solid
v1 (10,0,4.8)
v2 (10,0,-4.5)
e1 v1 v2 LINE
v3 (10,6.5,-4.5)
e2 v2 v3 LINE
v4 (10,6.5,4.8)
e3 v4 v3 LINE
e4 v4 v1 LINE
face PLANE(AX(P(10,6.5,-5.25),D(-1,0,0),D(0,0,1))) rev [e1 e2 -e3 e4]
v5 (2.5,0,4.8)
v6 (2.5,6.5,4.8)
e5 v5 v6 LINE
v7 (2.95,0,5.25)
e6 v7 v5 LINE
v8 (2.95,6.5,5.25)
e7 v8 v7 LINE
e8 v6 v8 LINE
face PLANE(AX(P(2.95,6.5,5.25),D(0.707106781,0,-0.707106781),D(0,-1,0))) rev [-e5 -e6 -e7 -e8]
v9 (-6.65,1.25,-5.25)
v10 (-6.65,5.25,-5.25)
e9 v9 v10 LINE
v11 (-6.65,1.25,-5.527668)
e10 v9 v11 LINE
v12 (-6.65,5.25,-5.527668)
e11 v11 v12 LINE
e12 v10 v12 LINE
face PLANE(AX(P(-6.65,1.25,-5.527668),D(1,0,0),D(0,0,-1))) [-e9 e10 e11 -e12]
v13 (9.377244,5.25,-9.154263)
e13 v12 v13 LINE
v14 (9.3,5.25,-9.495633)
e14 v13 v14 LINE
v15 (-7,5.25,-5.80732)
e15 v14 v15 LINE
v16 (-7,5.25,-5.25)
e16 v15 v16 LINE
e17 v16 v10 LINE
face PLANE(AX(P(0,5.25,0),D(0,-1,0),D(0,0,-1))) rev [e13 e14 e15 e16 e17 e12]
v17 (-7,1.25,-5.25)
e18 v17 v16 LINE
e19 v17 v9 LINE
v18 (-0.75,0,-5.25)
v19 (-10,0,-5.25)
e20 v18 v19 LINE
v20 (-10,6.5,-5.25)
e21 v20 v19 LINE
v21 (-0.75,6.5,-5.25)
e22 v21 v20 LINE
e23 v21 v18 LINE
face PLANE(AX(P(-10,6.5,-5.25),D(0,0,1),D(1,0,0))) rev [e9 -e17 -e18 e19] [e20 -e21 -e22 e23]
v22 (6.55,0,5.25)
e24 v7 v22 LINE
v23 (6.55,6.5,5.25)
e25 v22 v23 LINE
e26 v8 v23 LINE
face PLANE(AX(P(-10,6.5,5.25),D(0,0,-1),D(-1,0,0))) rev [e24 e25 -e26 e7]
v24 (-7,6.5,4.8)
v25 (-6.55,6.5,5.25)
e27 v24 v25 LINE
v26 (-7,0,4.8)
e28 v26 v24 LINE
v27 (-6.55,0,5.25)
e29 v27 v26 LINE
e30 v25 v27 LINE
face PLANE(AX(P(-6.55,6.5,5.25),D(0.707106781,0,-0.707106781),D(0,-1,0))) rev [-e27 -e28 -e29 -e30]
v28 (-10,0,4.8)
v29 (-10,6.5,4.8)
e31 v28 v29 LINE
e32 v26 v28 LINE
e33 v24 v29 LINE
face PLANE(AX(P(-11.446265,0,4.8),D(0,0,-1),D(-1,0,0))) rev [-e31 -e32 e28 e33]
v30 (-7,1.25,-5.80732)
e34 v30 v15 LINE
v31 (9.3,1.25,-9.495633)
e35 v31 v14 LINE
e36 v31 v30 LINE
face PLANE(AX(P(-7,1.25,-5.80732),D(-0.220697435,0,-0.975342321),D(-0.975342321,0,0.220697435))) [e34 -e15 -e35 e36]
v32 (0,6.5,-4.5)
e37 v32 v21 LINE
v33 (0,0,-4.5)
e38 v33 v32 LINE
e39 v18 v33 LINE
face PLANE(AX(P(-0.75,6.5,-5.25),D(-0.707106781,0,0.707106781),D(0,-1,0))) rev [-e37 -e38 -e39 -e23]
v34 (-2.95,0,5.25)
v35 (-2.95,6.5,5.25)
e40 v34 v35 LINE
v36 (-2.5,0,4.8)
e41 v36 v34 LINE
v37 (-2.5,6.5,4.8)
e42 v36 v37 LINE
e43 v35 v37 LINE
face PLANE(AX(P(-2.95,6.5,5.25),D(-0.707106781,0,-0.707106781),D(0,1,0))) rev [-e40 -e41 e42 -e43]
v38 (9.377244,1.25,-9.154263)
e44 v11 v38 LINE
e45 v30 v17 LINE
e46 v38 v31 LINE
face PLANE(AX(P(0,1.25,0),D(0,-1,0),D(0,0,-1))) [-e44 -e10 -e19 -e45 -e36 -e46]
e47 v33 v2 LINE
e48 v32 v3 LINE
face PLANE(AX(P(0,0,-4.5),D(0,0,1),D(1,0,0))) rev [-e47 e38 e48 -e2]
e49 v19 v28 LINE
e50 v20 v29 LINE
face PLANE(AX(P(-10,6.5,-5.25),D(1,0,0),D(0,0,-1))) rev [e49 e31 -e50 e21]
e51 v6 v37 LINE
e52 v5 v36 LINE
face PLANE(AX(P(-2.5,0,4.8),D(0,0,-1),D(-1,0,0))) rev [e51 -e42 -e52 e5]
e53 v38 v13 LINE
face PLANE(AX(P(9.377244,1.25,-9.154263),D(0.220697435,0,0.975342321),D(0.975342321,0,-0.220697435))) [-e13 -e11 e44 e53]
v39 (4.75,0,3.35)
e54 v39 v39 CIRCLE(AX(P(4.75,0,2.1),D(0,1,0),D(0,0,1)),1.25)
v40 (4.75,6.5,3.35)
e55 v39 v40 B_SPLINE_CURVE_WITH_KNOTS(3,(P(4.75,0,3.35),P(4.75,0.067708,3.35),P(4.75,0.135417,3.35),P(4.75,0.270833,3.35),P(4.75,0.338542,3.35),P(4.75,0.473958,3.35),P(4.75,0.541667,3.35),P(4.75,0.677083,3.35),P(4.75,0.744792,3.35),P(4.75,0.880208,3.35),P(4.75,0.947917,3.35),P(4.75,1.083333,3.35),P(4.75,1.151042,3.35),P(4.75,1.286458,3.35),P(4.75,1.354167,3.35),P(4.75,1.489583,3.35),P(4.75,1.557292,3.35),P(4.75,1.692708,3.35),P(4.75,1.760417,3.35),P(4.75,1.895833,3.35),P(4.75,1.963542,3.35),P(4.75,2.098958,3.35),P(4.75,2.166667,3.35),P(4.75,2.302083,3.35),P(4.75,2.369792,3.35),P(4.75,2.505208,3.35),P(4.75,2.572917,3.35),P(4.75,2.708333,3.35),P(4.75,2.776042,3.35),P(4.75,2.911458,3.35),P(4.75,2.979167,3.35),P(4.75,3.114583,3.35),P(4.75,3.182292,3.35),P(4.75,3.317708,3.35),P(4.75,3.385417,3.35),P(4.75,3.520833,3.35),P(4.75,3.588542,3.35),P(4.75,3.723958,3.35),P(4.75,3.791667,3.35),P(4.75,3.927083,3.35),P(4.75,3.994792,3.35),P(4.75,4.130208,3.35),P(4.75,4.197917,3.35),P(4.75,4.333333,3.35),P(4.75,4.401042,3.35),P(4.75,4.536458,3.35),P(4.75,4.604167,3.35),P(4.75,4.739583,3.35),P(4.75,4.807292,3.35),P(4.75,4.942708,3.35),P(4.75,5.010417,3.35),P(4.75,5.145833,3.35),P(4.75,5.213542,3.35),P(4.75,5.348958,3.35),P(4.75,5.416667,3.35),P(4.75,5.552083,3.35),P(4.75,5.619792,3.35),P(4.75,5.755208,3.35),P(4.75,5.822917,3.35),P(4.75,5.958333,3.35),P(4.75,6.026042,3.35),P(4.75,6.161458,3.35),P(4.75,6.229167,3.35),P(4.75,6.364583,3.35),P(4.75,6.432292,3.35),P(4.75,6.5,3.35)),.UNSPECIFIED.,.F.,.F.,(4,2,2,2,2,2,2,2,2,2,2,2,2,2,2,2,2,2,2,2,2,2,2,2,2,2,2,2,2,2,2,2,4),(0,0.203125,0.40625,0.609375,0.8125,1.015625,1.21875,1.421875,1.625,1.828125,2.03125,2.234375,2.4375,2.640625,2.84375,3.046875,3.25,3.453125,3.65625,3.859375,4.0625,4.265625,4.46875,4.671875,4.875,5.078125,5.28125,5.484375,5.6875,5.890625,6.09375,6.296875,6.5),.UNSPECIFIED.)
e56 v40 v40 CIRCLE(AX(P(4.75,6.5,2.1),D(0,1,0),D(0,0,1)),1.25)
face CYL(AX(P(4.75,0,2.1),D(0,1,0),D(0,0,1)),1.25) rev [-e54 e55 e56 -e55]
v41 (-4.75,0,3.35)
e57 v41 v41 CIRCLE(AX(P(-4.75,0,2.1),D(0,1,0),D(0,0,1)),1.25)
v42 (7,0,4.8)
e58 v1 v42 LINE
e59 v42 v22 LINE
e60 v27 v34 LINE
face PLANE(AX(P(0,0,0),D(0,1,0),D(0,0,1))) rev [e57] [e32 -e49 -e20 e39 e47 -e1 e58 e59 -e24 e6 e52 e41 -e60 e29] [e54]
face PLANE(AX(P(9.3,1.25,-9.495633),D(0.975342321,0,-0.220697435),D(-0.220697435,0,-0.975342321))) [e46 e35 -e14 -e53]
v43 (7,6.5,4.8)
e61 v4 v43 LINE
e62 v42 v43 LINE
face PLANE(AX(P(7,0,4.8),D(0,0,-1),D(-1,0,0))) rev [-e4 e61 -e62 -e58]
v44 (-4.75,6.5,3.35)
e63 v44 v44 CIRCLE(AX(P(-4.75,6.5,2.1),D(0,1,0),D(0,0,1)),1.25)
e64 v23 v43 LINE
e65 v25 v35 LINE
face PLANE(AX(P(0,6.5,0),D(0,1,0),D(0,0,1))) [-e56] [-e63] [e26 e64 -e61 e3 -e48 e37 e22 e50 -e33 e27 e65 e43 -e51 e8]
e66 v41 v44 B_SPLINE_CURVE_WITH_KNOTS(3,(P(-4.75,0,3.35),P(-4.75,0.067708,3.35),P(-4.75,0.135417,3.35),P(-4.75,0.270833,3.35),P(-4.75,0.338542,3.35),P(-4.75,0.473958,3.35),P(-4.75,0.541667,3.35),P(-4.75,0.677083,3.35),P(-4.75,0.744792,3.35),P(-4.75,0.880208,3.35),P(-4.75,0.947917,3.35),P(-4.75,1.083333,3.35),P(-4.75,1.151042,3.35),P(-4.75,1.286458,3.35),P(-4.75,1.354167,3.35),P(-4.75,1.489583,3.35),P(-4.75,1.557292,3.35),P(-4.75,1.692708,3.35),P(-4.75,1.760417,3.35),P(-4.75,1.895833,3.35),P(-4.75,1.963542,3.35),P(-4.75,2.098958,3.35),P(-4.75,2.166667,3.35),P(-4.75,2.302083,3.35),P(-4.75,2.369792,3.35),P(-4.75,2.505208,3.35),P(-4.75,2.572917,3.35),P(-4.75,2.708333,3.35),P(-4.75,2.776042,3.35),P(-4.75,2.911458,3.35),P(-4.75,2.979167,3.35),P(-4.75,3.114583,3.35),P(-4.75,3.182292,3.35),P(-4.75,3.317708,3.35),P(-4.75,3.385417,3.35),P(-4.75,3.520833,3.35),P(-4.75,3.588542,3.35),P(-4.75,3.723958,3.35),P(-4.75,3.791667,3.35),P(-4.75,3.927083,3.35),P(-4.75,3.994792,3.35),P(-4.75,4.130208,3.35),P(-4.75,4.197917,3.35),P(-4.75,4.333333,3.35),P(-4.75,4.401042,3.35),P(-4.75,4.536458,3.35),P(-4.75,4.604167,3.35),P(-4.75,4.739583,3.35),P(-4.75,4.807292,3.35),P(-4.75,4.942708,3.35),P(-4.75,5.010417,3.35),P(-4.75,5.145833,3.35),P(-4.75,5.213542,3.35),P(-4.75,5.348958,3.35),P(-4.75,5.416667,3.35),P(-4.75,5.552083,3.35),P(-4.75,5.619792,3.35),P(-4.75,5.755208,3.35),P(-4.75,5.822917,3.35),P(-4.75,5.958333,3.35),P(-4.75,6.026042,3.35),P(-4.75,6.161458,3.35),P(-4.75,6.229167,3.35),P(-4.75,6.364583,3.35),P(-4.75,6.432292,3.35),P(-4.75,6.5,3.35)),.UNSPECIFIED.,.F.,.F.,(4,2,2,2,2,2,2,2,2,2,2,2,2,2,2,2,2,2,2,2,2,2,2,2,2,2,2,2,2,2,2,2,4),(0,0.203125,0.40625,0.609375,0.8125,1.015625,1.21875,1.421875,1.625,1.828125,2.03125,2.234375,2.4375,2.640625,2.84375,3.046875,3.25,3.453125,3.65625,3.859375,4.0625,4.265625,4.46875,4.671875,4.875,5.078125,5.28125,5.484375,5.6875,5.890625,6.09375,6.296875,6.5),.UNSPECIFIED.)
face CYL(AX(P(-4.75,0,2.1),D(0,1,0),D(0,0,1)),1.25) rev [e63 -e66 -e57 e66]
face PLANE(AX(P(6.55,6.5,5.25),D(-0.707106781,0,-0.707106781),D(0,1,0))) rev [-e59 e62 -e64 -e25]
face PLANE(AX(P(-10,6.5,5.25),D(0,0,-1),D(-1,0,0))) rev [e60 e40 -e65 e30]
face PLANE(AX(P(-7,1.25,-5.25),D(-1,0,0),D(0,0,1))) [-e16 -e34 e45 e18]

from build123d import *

# Parameters (mm, degrees)
SKETCH_1_W          = 20
SKETCH_1_H          = 10.5
EXTRUDE_1_DEPTH     = 6.5
SKETCH_2_R          = 1.25
CUT_EXTRUDE_1_DEPTH = 6.5
SKETCH_3_W          = 4.44626532
SKETCH_3_H          = 1.008872475
SKETCH_3_W_2        = 5
SKETCH_3_W_3        = 3.65317203
CUT_EXTRUDE_2_DEPTH = 6.5
CHAMFER_1_SIZE      = 0.45
SKETCH_4_W          = 10.31021277
SKETCH_4_H          = 1.008783122
CUT_EXTRUDE_3_DEPTH = 6.5
CHAMFER_2_SIZE      = 0.75
EXTRUDE_2_DEPTH     = 4


with BuildPart() as part:
    # 스케치1 → 보스-돌출1 (new body)
    with BuildSketch(Plane(origin=(0, 0, 0), x_dir=(1, 0, 0), z_dir=(0, 1, 0))):
        Rectangle(SKETCH_1_W, SKETCH_1_H)
    extrude(amount=EXTRUDE_1_DEPTH)

    # 스케치2 → 컷-돌출1 (cut)
    with BuildSketch(Plane(origin=(0, 6.5, 0), x_dir=(1, 0, 0), z_dir=(0, 1, 0))):
        with Locations(Location((-4.75, -2.1, 0), (0, 0, 270))):
            Circle(SKETCH_2_R)
        with Locations(Location((4.75, -2.1, 0), (0, 0, 270))):
            Circle(SKETCH_2_R)
    extrude(amount=-CUT_EXTRUDE_1_DEPTH, mode=Mode.SUBTRACT)

    # 스케치3 → 컷-돌출2 (cut)
    with BuildSketch(Plane(origin=(0, 6.5, 0), x_dir=(1, 0, 0), z_dir=(0, 1, 0))):
        with Locations((-9.22313266, -5.304436238)):
            Rectangle(SKETCH_3_W, SKETCH_3_H)
        with Locations((0, -5.304436238)):
            Rectangle(SKETCH_3_W_2, SKETCH_3_H)
        with Locations((8.826586015, -5.304436238)):
            Rectangle(SKETCH_3_W_3, SKETCH_3_H)
    extrude(amount=-CUT_EXTRUDE_2_DEPTH, mode=Mode.SUBTRACT)

    # 모따기1
    chamfer_1_edges = [part.edges().sort_by_distance(p)[0] for p in [
        (7, 3.25, 5.25),
        (2.5, 3.25, 5.25),
        (-2.5, 3.25, 5.25),
        (-7, 3.25, 5.25),
    ]]
    chamfer(chamfer_1_edges, length=CHAMFER_1_SIZE - 0.0001)  # a hair under: the kernel refuses the full size

    # 스케치4 → 컷-돌출3 (cut)
    with BuildSketch(Plane(origin=(0, 6.5, 0), x_dir=(1, 0, 0), z_dir=(0, 1, 0))):
        with Locations((5.155106385, 5.004391561)):
            Rectangle(SKETCH_4_W, SKETCH_4_H)
    extrude(amount=-CUT_EXTRUDE_3_DEPTH, mode=Mode.SUBTRACT)

    # 모따기2
    chamfer_2_edges = [part.edges().sort_by_distance(p)[0] for p in [
        (0, 3.25, -5.25),
    ]]
    chamfer(chamfer_2_edges, length=CHAMFER_2_SIZE - 0.0001)  # a hair under: the kernel refuses the full size

    # 스케치5 → 보스-돌출2 (add)
    with BuildSketch(Plane(origin=(0, 5.25, 0), x_dir=(1, 0, 0), z_dir=(0, 1, 0))):
        Polygon((-6.65, 5.25), (-7, 5.25), (-7, 5.807319656), (9.3, 9.495633097), (9.377244102, 9.154263285), (-6.65, 5.527668202), align=None)
    extrude(amount=-EXTRUDE_2_DEPTH)


solid = part.part
